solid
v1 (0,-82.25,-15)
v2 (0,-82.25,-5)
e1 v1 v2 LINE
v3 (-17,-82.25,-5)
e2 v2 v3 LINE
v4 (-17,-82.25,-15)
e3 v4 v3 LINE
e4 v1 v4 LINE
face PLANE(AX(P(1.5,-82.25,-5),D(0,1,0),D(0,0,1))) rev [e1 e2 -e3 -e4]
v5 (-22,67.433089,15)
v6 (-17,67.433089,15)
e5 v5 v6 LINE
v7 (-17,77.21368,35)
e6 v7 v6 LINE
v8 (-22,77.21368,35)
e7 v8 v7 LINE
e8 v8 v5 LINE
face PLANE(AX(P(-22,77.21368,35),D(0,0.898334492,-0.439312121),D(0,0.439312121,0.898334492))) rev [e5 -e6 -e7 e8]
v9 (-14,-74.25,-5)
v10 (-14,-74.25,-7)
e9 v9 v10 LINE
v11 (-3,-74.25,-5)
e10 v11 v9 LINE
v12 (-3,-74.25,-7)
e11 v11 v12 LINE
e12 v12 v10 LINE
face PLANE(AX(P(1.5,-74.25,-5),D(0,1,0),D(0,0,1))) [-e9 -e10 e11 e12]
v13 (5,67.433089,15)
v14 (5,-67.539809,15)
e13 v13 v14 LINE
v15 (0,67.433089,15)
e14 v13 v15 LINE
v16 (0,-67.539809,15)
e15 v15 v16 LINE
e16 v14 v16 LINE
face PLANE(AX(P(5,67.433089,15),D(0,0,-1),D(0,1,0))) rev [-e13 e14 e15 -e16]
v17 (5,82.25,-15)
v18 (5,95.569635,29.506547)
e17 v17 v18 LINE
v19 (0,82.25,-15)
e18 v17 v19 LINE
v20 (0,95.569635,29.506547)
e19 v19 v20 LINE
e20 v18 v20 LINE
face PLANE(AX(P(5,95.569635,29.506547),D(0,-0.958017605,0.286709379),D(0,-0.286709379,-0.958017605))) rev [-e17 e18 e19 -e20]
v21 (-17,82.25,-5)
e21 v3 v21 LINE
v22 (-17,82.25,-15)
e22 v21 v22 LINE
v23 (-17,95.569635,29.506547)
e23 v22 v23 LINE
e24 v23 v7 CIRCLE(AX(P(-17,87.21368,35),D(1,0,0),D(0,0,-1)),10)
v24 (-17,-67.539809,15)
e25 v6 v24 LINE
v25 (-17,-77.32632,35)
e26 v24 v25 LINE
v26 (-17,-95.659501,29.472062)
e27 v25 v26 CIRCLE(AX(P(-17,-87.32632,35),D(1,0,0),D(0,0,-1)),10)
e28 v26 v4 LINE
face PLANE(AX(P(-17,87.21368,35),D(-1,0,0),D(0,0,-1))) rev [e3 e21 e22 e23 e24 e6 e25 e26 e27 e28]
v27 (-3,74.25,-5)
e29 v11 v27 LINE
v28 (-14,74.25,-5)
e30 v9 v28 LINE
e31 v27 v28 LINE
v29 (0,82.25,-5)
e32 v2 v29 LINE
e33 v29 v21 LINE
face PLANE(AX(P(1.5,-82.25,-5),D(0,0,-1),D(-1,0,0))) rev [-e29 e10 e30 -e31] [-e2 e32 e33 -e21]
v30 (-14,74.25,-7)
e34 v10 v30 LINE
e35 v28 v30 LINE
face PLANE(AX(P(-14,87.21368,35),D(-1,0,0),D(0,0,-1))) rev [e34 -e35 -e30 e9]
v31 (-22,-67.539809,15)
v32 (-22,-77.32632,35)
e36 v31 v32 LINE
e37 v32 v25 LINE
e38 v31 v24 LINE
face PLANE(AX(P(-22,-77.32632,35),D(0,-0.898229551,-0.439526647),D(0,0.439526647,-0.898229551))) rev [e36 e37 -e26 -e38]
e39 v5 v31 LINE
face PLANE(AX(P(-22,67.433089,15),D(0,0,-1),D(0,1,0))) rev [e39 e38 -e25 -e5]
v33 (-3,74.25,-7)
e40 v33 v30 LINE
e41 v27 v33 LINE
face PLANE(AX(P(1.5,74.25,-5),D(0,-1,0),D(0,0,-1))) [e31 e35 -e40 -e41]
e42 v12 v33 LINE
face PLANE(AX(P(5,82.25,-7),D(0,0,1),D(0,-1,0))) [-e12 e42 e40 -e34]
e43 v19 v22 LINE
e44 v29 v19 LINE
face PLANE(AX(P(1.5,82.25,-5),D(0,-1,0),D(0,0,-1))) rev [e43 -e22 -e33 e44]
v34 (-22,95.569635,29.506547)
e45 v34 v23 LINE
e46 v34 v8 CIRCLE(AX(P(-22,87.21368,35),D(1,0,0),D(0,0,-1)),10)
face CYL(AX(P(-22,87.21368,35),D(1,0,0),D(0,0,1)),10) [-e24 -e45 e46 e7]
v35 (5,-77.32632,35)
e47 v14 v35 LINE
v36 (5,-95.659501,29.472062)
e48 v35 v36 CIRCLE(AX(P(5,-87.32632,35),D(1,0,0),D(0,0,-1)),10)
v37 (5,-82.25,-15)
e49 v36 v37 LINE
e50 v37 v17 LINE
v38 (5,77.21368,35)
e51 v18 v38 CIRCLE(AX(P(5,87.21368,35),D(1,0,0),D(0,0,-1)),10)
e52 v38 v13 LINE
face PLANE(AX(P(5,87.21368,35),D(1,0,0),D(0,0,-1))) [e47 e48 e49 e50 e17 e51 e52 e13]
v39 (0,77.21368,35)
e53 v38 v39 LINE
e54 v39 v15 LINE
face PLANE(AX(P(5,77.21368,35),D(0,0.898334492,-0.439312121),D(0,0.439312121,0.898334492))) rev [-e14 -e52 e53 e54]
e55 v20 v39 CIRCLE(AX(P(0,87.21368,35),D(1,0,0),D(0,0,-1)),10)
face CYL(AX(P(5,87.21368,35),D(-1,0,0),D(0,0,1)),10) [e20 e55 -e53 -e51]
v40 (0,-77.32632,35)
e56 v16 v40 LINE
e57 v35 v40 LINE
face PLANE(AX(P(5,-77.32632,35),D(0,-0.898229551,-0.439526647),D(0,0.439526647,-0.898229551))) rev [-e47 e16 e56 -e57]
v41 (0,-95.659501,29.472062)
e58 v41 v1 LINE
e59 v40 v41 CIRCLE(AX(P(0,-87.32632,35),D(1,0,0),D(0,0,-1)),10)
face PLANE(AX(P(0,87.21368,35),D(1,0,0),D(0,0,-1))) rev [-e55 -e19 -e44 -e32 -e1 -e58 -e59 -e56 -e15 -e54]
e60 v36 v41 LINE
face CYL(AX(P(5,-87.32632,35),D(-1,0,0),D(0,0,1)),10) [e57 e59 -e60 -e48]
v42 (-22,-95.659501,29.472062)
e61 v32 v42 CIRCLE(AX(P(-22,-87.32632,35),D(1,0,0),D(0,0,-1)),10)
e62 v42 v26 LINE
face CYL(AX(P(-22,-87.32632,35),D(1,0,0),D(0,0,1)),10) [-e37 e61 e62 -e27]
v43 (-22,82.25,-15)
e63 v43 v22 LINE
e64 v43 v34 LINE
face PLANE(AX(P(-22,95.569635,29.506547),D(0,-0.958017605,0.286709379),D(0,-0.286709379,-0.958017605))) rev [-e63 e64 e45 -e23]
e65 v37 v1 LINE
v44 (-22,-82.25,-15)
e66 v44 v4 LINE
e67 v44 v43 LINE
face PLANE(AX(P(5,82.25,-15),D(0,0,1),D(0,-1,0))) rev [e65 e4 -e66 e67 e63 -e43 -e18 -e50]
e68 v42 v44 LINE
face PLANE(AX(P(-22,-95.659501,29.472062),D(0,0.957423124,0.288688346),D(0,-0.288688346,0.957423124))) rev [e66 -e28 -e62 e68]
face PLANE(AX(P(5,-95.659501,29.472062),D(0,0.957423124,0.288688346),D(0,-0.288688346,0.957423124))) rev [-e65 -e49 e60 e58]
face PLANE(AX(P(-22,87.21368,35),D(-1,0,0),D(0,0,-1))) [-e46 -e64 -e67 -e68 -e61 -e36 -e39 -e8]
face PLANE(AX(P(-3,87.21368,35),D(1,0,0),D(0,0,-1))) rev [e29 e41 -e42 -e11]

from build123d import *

# Parameters (mm, degrees)
SALIENTE_EXTRUIR1_DEPTH = 5
CROQUIS3_W              = 10
CROQUIS3_H              = 164.5
SALIENTE_EXTRUIR2_DEPTH = 10
VACIADO1_START          = -74.25
VACIADO1_OUTLINE_W      = 11
VACIADO1_OUTLINE_H      = 2
VACIADO1_DEPTH          = 148.5


# Read off the part's stored shape, not the designer's step: Vaciado1
with BuildPart() as part:
    # Croquis1 → Saliente-Extruir1 (new body)
    with BuildSketch(Plane(origin=(0, 0, 0), x_dir=(0, 0, -1), z_dir=(1, 0, 0))):
        with BuildLine():
            Line((-29.506547344, 95.56963472), (15, 82.25))
            Line((15, 82.25), (15, -82.25))
            Line((15, -82.25), (-29.472062031, -95.659500692))
            ThreePointArc((-29.472062031, -95.659500692), (-44.574231242, -90.213203382), (-35, -77.326319918))
            Line((-35, -77.326319918), (-15, -67.539809421))
            Line((-15, -67.539809421), (-15, 67.43308889))
            Line((-15, 67.43308889), (-35, 77.213680082))
            ThreePointArc((-35, 77.213680082), (-44.580176052, 90.080773873), (-29.506547344, 95.56963472))
        make_face()
    extrude(amount=SALIENTE_EXTRUIR1_DEPTH)


with BuildPart() as body_2:
    # Simetría3: mirrored copy
    add(part.part.mirror(Plane(origin=(-8.5, 0, 0), x_dir=(0, 0, 1), z_dir=(1, 0, 0))))


with BuildPart() as part_1:
    add(part.part)

    add(body_2.part)  # Saliente-Extruir2 merges body 2
    # Croquis3 → Saliente-Extruir2 (add, symmetric)
    with BuildSketch(Plane(origin=(-8.5, 0, 0), x_dir=(0, 0, -1), z_dir=(1, 0, 0))):
        with Locations((10, 0)):
            Rectangle(CROQUIS3_W, CROQUIS3_H)
    extrude(amount=SALIENTE_EXTRUIR2_DEPTH, both=True)

    # Vaciado1 outline → Vaciado1 (cut)
    with BuildSketch(Plane(origin=(0, 0, 0), x_dir=(1, 0, 0), z_dir=(0, 1, 0)).offset(VACIADO1_START)):
        with Locations((-8.5, 6)):
            Rectangle(VACIADO1_OUTLINE_W, VACIADO1_OUTLINE_H)
    extrude(amount=VACIADO1_DEPTH, mode=Mode.SUBTRACT)


solid = part_1.part
